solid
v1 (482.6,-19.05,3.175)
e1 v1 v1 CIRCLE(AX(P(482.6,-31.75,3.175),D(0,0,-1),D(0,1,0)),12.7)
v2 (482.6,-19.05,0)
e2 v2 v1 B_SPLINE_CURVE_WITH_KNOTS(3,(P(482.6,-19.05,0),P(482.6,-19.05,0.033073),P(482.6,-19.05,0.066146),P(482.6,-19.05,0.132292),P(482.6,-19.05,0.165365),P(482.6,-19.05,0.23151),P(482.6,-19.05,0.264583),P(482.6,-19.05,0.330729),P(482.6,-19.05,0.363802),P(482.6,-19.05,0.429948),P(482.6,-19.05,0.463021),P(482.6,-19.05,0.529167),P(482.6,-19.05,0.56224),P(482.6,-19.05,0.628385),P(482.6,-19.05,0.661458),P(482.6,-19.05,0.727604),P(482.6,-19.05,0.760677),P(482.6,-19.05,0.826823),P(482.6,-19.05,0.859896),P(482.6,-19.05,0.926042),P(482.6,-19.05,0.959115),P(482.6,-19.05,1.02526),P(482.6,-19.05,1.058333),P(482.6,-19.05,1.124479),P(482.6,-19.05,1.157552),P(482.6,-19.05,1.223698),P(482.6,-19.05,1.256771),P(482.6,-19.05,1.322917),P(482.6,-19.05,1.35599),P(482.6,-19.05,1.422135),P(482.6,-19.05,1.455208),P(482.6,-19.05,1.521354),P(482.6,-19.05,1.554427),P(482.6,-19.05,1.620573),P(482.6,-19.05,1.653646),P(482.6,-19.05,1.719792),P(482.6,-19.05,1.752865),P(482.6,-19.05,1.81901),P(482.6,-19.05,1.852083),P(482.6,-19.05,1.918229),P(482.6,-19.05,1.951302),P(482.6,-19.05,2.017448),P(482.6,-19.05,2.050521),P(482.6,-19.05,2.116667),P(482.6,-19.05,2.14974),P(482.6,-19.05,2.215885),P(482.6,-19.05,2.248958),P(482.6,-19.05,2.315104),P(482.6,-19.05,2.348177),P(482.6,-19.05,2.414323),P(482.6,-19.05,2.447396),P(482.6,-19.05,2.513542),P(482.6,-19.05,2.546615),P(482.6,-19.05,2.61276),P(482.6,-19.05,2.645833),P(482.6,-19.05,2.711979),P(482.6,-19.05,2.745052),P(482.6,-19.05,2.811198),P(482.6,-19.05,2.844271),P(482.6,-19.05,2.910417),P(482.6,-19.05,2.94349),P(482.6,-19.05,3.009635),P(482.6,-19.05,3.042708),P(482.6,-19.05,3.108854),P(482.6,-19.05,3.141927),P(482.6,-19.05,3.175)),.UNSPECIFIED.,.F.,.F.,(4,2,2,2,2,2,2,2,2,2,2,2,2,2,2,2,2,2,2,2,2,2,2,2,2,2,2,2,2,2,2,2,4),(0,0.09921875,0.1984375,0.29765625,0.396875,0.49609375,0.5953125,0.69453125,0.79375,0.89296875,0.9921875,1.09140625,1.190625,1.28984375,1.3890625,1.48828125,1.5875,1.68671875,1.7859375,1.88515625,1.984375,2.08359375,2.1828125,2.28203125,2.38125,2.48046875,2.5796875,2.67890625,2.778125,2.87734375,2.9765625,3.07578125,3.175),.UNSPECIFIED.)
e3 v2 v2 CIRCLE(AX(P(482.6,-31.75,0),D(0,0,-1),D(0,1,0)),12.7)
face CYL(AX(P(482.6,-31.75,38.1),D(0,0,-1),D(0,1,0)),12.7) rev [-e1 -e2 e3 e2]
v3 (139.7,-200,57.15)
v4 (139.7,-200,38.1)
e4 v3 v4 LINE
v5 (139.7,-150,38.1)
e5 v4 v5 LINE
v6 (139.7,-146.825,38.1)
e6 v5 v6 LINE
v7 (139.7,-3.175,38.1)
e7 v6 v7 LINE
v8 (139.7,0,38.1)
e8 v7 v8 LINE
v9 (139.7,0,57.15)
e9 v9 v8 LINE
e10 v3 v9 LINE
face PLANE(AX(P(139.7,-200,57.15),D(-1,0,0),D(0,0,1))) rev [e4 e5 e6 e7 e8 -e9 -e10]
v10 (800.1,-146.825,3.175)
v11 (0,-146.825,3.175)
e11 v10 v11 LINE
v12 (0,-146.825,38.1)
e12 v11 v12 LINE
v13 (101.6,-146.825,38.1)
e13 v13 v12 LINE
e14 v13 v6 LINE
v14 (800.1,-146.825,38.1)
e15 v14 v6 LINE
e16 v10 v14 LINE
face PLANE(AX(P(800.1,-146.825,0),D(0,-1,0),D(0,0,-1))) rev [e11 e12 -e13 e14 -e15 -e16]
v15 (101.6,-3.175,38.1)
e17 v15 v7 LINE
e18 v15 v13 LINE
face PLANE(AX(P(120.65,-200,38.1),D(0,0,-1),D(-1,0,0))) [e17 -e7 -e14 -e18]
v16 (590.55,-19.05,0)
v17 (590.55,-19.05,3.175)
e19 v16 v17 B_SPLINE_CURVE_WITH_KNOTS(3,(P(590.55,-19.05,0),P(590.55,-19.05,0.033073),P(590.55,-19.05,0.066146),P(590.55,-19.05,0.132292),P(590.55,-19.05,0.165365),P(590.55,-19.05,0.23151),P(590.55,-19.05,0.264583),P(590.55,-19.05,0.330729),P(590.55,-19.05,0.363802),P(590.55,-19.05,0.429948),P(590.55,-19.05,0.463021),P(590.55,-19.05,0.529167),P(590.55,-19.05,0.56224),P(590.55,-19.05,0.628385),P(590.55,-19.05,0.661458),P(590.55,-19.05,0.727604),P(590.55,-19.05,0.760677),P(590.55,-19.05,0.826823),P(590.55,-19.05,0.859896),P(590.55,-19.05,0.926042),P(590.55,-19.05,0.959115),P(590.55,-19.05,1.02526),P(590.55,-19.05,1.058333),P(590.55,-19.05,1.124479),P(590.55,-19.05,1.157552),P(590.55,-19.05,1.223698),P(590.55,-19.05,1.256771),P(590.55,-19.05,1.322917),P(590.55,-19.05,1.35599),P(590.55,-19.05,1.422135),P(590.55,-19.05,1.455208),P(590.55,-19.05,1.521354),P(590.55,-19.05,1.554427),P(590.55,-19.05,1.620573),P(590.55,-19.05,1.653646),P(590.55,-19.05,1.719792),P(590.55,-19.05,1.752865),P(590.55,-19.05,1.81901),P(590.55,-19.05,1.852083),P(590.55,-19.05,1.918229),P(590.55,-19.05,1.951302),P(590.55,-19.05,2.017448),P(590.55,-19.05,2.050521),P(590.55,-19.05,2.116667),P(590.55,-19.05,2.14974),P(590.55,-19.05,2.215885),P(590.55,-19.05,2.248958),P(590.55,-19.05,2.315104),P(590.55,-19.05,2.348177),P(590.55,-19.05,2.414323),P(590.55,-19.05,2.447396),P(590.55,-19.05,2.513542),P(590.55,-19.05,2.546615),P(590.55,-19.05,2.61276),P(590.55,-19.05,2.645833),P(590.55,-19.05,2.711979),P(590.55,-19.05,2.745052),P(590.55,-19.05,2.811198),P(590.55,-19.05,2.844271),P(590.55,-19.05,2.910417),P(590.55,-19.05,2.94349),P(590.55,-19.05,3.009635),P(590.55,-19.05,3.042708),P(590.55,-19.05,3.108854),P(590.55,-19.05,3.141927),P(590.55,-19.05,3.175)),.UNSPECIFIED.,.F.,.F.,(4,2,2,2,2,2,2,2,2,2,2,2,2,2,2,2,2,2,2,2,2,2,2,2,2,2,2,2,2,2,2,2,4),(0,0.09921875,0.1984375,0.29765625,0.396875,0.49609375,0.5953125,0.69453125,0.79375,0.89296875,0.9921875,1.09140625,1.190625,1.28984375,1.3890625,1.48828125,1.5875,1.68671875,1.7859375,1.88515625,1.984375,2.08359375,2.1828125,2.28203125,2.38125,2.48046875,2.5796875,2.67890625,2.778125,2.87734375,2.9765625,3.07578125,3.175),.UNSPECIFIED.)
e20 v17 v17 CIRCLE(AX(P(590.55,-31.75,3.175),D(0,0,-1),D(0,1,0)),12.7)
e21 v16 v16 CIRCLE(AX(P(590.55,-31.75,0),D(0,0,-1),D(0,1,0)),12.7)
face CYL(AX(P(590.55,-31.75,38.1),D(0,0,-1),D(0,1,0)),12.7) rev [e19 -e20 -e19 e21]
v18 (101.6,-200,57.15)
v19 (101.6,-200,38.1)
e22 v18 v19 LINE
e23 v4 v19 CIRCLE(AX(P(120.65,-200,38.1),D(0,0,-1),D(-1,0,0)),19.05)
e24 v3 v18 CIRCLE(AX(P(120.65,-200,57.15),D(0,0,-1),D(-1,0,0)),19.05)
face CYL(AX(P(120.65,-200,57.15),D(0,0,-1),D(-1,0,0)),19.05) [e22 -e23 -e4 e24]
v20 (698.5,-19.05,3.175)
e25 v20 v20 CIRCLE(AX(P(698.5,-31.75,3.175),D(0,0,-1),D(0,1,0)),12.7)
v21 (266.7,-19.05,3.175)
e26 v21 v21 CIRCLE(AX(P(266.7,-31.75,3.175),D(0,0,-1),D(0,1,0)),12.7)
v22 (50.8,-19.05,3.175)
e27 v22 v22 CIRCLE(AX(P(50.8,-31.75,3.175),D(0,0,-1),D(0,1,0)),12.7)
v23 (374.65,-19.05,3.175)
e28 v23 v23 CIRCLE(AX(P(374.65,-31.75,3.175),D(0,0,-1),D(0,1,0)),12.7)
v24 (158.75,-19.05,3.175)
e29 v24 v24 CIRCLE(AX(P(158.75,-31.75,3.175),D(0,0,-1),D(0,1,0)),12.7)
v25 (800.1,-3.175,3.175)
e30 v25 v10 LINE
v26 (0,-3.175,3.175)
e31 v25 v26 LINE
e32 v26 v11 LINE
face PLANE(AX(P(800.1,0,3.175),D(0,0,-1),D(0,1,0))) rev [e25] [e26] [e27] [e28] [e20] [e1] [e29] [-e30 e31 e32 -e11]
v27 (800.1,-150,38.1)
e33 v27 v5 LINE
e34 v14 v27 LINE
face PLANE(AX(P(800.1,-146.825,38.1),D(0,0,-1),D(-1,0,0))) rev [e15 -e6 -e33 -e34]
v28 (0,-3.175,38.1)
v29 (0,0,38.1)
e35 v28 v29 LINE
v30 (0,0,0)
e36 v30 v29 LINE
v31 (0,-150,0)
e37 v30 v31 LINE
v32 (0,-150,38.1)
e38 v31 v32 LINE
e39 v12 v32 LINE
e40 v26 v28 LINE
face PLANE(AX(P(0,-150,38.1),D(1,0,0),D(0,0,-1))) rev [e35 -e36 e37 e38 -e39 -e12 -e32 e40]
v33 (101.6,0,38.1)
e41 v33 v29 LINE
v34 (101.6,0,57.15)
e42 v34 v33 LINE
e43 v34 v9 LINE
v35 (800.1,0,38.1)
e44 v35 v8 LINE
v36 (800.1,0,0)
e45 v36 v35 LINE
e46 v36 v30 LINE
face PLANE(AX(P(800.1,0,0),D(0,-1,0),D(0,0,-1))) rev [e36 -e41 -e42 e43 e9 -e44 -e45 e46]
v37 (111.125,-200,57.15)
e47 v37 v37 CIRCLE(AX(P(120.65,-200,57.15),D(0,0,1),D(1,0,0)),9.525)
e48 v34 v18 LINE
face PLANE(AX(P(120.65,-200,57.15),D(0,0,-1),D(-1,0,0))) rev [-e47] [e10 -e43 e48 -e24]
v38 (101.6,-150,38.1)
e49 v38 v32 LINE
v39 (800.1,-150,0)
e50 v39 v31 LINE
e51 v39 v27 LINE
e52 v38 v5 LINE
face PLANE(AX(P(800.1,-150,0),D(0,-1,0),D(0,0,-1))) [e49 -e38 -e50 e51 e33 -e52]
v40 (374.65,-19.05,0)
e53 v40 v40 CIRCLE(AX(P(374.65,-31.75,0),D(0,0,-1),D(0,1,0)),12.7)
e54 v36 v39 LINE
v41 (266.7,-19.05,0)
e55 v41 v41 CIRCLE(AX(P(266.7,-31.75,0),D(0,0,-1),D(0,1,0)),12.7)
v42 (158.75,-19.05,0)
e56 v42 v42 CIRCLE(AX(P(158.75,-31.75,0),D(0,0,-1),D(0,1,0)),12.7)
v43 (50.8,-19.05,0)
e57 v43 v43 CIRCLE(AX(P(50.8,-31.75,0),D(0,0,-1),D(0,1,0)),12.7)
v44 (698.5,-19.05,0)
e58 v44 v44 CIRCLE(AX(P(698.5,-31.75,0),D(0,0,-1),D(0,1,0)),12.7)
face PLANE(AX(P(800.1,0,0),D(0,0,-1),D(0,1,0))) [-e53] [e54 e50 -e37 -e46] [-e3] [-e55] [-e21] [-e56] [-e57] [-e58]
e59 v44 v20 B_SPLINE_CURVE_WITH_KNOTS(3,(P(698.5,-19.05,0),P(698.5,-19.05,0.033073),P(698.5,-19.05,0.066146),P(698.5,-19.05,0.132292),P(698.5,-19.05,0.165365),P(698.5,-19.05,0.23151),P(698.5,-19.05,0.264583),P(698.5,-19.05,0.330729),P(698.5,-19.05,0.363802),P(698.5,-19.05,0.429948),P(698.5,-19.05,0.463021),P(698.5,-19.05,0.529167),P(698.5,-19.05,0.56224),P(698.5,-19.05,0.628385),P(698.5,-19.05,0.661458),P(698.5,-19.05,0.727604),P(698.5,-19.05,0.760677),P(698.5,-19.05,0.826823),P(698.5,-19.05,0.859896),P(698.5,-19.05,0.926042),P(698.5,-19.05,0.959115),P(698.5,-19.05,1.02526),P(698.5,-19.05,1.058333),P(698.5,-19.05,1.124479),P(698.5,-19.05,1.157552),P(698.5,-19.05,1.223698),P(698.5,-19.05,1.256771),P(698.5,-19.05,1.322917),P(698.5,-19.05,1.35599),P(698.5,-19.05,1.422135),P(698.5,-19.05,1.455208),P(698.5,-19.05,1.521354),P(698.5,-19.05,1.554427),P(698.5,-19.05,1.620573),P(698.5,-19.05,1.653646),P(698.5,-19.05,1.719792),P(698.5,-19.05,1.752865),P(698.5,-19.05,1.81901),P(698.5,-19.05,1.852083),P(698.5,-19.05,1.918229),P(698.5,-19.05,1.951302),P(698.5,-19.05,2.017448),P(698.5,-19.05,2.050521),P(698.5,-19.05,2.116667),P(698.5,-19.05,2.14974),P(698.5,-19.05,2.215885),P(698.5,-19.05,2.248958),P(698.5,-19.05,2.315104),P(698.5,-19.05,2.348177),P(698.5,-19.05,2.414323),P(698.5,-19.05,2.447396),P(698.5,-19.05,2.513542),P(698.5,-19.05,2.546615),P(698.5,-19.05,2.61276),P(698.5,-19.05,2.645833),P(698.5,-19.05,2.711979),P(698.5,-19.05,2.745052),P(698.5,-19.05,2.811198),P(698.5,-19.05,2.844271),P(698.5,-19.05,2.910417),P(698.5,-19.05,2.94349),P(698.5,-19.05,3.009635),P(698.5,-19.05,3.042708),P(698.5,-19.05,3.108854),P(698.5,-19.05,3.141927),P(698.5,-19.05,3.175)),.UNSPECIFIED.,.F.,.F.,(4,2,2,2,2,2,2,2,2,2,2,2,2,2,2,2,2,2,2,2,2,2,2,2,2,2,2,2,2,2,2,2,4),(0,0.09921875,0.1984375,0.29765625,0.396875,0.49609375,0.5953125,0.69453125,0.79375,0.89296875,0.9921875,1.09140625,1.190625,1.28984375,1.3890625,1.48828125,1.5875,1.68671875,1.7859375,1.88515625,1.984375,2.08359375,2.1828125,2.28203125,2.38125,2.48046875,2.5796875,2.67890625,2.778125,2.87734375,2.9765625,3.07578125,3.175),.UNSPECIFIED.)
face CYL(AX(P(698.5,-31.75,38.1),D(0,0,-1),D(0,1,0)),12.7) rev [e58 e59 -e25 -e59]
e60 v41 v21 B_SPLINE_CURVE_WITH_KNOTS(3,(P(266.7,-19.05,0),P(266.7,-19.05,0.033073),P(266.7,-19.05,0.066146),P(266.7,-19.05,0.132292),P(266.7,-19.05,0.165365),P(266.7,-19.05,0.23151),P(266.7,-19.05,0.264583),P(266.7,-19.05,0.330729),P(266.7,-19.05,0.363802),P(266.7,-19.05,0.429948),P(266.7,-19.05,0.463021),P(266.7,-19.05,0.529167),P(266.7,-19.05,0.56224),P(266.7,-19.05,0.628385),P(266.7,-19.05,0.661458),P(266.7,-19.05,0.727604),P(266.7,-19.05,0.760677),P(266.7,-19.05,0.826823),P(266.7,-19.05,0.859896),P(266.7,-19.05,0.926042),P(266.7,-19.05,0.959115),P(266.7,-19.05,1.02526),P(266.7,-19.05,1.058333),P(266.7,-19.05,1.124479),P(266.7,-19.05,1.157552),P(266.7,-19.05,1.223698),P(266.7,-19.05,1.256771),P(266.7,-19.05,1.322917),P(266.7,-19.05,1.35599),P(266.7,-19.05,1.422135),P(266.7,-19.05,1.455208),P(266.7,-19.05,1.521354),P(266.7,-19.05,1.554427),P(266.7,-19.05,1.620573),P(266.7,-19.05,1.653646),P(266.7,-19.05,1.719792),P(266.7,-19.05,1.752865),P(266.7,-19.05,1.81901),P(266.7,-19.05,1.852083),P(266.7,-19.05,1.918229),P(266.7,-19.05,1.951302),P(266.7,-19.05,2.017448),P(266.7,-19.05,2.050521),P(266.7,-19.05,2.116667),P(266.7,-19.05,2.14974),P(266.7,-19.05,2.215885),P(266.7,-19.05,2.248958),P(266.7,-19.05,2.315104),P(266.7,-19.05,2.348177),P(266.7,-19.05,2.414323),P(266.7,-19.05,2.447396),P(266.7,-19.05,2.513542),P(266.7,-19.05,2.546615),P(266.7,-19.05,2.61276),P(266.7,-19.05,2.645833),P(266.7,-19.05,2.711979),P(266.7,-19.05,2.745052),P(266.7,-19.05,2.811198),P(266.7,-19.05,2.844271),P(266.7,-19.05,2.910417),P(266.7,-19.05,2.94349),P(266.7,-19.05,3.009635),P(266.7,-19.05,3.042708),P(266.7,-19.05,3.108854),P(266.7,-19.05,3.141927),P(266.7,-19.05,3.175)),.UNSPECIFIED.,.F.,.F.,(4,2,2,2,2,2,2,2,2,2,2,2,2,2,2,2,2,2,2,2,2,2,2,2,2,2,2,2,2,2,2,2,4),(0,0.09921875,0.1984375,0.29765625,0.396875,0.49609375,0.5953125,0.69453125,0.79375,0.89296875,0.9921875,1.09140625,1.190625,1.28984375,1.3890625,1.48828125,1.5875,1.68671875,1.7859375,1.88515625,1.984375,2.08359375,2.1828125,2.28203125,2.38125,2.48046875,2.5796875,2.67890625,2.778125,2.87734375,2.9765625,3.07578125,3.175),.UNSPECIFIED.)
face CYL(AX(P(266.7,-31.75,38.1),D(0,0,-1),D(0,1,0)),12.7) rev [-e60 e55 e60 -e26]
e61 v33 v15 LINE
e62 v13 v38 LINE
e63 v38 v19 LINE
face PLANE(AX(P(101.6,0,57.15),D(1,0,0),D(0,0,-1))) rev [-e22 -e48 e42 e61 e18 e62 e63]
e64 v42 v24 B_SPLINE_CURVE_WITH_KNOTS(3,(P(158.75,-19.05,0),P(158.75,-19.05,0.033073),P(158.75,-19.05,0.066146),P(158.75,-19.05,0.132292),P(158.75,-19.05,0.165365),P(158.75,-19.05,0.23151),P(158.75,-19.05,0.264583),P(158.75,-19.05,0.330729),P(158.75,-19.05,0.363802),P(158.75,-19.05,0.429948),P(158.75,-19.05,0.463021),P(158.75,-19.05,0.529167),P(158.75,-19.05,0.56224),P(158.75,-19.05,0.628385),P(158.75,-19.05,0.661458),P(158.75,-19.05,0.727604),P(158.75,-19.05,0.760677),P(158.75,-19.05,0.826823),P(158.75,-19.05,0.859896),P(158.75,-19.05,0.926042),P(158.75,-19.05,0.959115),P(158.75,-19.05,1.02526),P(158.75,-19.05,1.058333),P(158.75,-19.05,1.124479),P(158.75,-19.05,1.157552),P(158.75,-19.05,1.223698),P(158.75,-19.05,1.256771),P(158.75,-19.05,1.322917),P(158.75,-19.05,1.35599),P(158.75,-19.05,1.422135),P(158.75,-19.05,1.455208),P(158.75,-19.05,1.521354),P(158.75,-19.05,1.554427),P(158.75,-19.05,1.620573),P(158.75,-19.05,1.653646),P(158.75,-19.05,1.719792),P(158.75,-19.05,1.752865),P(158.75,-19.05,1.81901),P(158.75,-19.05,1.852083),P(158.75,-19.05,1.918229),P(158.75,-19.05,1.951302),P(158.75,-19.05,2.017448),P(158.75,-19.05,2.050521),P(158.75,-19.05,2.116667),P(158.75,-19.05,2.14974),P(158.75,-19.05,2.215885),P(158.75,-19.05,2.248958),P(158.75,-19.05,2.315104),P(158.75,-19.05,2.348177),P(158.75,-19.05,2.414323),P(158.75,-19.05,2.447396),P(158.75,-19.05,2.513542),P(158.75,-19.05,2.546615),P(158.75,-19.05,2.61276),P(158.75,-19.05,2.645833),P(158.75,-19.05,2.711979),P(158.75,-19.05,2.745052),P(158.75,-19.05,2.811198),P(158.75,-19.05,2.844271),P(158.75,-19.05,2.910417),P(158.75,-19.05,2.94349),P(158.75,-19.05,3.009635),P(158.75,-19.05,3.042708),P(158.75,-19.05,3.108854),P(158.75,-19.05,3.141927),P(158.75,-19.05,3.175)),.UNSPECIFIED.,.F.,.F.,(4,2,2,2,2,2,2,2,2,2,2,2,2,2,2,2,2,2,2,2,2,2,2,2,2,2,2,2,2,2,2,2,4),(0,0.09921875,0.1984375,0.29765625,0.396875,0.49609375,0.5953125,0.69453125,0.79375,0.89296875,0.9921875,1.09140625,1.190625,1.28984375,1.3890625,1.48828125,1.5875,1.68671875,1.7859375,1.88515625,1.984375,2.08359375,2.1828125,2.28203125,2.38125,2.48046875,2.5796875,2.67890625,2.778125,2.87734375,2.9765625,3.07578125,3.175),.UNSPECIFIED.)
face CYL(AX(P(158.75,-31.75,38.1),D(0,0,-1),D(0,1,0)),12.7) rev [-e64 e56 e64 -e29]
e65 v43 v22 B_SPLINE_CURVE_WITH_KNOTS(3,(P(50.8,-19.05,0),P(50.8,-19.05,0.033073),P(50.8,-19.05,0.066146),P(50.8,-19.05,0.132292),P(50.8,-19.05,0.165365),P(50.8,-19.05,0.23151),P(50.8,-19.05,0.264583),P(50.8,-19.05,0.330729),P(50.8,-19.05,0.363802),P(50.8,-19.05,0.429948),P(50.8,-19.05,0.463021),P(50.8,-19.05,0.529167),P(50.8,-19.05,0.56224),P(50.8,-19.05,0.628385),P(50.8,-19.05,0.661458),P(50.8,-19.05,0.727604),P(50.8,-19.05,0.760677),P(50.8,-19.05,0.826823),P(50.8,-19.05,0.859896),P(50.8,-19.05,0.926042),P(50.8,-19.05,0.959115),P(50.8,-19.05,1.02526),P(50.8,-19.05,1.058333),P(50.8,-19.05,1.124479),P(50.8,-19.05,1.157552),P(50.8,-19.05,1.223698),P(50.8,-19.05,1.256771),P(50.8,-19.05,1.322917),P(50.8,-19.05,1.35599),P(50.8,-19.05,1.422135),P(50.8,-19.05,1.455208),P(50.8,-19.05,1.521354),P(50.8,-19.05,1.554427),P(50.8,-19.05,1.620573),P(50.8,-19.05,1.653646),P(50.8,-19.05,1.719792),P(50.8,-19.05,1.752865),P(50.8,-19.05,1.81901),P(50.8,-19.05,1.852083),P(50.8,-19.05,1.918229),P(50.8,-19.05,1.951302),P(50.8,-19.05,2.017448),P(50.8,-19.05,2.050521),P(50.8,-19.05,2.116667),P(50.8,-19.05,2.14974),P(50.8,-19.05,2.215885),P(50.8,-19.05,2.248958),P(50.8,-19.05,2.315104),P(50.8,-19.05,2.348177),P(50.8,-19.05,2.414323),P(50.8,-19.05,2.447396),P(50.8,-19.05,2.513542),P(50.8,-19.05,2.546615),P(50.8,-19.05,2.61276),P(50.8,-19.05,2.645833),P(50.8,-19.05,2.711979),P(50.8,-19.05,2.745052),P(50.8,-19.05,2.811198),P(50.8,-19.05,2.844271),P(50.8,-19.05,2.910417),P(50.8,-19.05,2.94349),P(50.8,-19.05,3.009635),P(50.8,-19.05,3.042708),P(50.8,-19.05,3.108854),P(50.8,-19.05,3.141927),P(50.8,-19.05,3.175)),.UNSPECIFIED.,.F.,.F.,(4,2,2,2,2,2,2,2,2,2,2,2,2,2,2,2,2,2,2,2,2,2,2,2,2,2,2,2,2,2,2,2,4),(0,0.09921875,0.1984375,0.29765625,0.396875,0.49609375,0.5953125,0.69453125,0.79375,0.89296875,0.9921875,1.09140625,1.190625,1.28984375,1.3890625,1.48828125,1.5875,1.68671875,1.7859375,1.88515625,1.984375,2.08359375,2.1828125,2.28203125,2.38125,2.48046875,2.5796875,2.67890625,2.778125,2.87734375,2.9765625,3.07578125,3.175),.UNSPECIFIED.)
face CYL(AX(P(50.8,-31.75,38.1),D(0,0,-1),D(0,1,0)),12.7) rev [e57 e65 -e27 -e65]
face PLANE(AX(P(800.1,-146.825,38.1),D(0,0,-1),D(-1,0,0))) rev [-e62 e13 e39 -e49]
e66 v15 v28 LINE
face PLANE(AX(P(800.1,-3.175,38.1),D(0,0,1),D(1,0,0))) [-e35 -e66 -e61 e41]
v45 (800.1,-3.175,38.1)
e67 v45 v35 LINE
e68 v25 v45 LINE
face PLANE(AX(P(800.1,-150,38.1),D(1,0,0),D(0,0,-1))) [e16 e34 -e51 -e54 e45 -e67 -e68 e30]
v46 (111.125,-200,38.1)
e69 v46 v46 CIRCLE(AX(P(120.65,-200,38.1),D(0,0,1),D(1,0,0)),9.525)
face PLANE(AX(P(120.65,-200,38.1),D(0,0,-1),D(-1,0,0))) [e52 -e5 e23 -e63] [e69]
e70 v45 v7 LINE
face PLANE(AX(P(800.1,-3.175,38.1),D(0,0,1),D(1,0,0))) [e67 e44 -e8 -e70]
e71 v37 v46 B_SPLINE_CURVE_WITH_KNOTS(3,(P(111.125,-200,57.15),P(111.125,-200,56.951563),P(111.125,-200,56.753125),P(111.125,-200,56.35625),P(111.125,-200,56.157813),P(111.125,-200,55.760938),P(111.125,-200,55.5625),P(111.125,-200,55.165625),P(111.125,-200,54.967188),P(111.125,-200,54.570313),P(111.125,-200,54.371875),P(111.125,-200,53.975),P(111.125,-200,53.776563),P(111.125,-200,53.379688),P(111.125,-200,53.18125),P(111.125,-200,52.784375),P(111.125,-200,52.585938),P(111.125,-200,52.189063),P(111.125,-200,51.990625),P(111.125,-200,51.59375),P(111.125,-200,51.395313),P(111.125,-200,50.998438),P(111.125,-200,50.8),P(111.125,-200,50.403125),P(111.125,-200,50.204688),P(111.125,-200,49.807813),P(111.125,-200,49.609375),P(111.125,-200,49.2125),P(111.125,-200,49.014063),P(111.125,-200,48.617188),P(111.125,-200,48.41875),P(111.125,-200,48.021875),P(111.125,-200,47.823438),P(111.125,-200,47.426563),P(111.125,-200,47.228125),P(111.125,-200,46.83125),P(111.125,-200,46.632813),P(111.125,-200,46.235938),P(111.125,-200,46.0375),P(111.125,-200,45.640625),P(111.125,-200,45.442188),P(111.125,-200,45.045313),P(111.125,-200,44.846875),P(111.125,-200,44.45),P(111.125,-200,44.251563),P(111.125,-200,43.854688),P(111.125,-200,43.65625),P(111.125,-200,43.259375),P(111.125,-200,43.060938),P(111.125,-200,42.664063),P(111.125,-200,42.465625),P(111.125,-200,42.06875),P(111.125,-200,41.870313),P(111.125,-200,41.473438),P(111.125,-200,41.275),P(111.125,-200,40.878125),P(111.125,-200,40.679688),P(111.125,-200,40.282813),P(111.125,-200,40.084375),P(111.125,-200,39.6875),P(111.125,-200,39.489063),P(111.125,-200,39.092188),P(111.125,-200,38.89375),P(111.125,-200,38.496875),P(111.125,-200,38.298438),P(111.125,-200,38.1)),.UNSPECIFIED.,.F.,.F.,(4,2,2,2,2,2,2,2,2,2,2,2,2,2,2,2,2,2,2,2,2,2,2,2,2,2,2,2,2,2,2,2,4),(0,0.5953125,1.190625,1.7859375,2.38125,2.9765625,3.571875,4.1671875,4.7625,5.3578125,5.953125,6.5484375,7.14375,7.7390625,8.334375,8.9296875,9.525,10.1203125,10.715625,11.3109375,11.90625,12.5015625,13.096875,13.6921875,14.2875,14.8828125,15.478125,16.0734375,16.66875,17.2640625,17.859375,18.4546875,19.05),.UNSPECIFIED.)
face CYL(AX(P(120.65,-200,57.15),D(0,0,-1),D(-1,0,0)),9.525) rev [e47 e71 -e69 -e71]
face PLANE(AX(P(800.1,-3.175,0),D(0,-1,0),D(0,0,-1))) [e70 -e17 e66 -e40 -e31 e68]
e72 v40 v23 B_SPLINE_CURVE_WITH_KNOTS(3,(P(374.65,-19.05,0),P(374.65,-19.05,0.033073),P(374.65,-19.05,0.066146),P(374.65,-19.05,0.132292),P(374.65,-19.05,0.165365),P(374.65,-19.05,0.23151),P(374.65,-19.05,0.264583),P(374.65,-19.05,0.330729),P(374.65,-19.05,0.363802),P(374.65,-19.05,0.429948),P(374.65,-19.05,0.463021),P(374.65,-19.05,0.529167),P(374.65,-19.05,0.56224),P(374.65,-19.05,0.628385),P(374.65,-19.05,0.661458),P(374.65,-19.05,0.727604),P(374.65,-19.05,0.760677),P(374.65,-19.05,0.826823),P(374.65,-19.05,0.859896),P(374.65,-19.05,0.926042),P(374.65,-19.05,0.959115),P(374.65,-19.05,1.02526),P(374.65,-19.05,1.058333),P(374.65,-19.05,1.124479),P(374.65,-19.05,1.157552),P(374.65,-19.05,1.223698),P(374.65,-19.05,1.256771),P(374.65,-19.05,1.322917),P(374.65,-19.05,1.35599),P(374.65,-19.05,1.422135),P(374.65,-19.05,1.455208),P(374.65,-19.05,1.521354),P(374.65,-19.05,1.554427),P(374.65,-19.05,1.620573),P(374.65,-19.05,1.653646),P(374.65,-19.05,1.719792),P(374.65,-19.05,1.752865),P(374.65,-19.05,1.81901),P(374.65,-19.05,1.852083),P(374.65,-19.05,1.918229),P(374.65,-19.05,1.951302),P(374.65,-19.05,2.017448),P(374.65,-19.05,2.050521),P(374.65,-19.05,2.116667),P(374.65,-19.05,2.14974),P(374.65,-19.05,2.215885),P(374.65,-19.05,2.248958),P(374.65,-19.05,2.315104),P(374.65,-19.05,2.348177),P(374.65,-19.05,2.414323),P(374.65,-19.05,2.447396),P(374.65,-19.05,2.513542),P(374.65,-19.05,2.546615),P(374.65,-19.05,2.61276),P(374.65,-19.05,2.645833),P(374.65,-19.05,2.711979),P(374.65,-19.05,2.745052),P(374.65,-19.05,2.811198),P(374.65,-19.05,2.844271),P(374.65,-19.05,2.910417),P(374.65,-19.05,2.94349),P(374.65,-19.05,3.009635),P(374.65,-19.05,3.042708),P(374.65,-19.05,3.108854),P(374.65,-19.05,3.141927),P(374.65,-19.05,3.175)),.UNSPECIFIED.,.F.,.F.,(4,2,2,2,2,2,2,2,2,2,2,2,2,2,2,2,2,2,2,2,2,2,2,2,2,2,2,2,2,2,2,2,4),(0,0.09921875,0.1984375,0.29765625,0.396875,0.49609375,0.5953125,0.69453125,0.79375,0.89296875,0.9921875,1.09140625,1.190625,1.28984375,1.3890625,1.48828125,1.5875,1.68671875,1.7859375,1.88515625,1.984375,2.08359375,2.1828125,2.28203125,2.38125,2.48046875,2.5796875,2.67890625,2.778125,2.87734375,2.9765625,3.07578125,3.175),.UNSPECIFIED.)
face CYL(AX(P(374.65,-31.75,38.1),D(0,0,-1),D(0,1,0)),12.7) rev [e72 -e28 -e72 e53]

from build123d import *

# Parameters (mm, degrees)
BASE_EXTRUDE_THIN_DEPTH = 800.1
SKETCH2_R               = 12.7
CUT_EXTRUDE1_DEPTH      = 815.930438749
LPATTERN1_COUNT         = 7
LPATTERN1_PITCH         = 107.95
BOSS_EXTRUDE1_START     = 38.1
BOSS_EXTRUDE1_OUTLINE_R = 9.525
BOSS_EXTRUDE1_DEPTH     = 19.05


# Read off the part's stored shape, not the designer's step: Boss-Extrude1
with BuildPart() as part:
    # Sketch1 → Base-Extrude-Thin (new body)
    with BuildSketch(Plane(origin=(0, 0, 0), x_dir=(0, 0, -1), z_dir=(1, 0, 0))):
        Polygon((-38.1, 0), (0, 0), (0, -150), (-38.1, -150), (-38.1, -146.825), (-3.175, -146.825), (-3.175, -3.175), (-38.1, -3.175), align=None)
    extrude(amount=BASE_EXTRUDE_THIN_DEPTH)

    # Sketch2 → Cut-Extrude1 (cut, through all)
    with BuildSketch(Plane(origin=(0, 0, 0), x_dir=(-1, 0, 0), z_dir=(0, 0, -1))):
        with Locations(Location((-50.8, -31.75, 0), (0, 0, 90))):
            Circle(SKETCH2_R)
    cut_extrude1 = extrude(amount=-CUT_EXTRUDE1_DEPTH, mode=Mode.SUBTRACT)

    # LPattern1: Cut-Extrude1 ×7
    with Locations(*[(i * LPATTERN1_PITCH, 0, 0) for i in range(1, LPATTERN1_COUNT)]):
        add(cut_extrude1, mode=Mode.SUBTRACT)

    # Boss-Extrude1 outline → Boss-Extrude1 (add)
    with BuildSketch(Plane.XY.offset(BOSS_EXTRUDE1_START)):
        with BuildLine():
            Line((101.6, 0), (101.6, -200))
            ThreePointArc((101.6, -200), (120.65, -219.05), (139.7, -200))
            Line((139.7, -200), (139.7, 0))
            Line((139.7, 0), (101.6, 0))
        make_face()
        with Locations((120.65, -200)):
            Circle(BOSS_EXTRUDE1_OUTLINE_R, mode=Mode.SUBTRACT)
    extrude(amount=BOSS_EXTRUDE1_DEPTH)


solid = part.part
